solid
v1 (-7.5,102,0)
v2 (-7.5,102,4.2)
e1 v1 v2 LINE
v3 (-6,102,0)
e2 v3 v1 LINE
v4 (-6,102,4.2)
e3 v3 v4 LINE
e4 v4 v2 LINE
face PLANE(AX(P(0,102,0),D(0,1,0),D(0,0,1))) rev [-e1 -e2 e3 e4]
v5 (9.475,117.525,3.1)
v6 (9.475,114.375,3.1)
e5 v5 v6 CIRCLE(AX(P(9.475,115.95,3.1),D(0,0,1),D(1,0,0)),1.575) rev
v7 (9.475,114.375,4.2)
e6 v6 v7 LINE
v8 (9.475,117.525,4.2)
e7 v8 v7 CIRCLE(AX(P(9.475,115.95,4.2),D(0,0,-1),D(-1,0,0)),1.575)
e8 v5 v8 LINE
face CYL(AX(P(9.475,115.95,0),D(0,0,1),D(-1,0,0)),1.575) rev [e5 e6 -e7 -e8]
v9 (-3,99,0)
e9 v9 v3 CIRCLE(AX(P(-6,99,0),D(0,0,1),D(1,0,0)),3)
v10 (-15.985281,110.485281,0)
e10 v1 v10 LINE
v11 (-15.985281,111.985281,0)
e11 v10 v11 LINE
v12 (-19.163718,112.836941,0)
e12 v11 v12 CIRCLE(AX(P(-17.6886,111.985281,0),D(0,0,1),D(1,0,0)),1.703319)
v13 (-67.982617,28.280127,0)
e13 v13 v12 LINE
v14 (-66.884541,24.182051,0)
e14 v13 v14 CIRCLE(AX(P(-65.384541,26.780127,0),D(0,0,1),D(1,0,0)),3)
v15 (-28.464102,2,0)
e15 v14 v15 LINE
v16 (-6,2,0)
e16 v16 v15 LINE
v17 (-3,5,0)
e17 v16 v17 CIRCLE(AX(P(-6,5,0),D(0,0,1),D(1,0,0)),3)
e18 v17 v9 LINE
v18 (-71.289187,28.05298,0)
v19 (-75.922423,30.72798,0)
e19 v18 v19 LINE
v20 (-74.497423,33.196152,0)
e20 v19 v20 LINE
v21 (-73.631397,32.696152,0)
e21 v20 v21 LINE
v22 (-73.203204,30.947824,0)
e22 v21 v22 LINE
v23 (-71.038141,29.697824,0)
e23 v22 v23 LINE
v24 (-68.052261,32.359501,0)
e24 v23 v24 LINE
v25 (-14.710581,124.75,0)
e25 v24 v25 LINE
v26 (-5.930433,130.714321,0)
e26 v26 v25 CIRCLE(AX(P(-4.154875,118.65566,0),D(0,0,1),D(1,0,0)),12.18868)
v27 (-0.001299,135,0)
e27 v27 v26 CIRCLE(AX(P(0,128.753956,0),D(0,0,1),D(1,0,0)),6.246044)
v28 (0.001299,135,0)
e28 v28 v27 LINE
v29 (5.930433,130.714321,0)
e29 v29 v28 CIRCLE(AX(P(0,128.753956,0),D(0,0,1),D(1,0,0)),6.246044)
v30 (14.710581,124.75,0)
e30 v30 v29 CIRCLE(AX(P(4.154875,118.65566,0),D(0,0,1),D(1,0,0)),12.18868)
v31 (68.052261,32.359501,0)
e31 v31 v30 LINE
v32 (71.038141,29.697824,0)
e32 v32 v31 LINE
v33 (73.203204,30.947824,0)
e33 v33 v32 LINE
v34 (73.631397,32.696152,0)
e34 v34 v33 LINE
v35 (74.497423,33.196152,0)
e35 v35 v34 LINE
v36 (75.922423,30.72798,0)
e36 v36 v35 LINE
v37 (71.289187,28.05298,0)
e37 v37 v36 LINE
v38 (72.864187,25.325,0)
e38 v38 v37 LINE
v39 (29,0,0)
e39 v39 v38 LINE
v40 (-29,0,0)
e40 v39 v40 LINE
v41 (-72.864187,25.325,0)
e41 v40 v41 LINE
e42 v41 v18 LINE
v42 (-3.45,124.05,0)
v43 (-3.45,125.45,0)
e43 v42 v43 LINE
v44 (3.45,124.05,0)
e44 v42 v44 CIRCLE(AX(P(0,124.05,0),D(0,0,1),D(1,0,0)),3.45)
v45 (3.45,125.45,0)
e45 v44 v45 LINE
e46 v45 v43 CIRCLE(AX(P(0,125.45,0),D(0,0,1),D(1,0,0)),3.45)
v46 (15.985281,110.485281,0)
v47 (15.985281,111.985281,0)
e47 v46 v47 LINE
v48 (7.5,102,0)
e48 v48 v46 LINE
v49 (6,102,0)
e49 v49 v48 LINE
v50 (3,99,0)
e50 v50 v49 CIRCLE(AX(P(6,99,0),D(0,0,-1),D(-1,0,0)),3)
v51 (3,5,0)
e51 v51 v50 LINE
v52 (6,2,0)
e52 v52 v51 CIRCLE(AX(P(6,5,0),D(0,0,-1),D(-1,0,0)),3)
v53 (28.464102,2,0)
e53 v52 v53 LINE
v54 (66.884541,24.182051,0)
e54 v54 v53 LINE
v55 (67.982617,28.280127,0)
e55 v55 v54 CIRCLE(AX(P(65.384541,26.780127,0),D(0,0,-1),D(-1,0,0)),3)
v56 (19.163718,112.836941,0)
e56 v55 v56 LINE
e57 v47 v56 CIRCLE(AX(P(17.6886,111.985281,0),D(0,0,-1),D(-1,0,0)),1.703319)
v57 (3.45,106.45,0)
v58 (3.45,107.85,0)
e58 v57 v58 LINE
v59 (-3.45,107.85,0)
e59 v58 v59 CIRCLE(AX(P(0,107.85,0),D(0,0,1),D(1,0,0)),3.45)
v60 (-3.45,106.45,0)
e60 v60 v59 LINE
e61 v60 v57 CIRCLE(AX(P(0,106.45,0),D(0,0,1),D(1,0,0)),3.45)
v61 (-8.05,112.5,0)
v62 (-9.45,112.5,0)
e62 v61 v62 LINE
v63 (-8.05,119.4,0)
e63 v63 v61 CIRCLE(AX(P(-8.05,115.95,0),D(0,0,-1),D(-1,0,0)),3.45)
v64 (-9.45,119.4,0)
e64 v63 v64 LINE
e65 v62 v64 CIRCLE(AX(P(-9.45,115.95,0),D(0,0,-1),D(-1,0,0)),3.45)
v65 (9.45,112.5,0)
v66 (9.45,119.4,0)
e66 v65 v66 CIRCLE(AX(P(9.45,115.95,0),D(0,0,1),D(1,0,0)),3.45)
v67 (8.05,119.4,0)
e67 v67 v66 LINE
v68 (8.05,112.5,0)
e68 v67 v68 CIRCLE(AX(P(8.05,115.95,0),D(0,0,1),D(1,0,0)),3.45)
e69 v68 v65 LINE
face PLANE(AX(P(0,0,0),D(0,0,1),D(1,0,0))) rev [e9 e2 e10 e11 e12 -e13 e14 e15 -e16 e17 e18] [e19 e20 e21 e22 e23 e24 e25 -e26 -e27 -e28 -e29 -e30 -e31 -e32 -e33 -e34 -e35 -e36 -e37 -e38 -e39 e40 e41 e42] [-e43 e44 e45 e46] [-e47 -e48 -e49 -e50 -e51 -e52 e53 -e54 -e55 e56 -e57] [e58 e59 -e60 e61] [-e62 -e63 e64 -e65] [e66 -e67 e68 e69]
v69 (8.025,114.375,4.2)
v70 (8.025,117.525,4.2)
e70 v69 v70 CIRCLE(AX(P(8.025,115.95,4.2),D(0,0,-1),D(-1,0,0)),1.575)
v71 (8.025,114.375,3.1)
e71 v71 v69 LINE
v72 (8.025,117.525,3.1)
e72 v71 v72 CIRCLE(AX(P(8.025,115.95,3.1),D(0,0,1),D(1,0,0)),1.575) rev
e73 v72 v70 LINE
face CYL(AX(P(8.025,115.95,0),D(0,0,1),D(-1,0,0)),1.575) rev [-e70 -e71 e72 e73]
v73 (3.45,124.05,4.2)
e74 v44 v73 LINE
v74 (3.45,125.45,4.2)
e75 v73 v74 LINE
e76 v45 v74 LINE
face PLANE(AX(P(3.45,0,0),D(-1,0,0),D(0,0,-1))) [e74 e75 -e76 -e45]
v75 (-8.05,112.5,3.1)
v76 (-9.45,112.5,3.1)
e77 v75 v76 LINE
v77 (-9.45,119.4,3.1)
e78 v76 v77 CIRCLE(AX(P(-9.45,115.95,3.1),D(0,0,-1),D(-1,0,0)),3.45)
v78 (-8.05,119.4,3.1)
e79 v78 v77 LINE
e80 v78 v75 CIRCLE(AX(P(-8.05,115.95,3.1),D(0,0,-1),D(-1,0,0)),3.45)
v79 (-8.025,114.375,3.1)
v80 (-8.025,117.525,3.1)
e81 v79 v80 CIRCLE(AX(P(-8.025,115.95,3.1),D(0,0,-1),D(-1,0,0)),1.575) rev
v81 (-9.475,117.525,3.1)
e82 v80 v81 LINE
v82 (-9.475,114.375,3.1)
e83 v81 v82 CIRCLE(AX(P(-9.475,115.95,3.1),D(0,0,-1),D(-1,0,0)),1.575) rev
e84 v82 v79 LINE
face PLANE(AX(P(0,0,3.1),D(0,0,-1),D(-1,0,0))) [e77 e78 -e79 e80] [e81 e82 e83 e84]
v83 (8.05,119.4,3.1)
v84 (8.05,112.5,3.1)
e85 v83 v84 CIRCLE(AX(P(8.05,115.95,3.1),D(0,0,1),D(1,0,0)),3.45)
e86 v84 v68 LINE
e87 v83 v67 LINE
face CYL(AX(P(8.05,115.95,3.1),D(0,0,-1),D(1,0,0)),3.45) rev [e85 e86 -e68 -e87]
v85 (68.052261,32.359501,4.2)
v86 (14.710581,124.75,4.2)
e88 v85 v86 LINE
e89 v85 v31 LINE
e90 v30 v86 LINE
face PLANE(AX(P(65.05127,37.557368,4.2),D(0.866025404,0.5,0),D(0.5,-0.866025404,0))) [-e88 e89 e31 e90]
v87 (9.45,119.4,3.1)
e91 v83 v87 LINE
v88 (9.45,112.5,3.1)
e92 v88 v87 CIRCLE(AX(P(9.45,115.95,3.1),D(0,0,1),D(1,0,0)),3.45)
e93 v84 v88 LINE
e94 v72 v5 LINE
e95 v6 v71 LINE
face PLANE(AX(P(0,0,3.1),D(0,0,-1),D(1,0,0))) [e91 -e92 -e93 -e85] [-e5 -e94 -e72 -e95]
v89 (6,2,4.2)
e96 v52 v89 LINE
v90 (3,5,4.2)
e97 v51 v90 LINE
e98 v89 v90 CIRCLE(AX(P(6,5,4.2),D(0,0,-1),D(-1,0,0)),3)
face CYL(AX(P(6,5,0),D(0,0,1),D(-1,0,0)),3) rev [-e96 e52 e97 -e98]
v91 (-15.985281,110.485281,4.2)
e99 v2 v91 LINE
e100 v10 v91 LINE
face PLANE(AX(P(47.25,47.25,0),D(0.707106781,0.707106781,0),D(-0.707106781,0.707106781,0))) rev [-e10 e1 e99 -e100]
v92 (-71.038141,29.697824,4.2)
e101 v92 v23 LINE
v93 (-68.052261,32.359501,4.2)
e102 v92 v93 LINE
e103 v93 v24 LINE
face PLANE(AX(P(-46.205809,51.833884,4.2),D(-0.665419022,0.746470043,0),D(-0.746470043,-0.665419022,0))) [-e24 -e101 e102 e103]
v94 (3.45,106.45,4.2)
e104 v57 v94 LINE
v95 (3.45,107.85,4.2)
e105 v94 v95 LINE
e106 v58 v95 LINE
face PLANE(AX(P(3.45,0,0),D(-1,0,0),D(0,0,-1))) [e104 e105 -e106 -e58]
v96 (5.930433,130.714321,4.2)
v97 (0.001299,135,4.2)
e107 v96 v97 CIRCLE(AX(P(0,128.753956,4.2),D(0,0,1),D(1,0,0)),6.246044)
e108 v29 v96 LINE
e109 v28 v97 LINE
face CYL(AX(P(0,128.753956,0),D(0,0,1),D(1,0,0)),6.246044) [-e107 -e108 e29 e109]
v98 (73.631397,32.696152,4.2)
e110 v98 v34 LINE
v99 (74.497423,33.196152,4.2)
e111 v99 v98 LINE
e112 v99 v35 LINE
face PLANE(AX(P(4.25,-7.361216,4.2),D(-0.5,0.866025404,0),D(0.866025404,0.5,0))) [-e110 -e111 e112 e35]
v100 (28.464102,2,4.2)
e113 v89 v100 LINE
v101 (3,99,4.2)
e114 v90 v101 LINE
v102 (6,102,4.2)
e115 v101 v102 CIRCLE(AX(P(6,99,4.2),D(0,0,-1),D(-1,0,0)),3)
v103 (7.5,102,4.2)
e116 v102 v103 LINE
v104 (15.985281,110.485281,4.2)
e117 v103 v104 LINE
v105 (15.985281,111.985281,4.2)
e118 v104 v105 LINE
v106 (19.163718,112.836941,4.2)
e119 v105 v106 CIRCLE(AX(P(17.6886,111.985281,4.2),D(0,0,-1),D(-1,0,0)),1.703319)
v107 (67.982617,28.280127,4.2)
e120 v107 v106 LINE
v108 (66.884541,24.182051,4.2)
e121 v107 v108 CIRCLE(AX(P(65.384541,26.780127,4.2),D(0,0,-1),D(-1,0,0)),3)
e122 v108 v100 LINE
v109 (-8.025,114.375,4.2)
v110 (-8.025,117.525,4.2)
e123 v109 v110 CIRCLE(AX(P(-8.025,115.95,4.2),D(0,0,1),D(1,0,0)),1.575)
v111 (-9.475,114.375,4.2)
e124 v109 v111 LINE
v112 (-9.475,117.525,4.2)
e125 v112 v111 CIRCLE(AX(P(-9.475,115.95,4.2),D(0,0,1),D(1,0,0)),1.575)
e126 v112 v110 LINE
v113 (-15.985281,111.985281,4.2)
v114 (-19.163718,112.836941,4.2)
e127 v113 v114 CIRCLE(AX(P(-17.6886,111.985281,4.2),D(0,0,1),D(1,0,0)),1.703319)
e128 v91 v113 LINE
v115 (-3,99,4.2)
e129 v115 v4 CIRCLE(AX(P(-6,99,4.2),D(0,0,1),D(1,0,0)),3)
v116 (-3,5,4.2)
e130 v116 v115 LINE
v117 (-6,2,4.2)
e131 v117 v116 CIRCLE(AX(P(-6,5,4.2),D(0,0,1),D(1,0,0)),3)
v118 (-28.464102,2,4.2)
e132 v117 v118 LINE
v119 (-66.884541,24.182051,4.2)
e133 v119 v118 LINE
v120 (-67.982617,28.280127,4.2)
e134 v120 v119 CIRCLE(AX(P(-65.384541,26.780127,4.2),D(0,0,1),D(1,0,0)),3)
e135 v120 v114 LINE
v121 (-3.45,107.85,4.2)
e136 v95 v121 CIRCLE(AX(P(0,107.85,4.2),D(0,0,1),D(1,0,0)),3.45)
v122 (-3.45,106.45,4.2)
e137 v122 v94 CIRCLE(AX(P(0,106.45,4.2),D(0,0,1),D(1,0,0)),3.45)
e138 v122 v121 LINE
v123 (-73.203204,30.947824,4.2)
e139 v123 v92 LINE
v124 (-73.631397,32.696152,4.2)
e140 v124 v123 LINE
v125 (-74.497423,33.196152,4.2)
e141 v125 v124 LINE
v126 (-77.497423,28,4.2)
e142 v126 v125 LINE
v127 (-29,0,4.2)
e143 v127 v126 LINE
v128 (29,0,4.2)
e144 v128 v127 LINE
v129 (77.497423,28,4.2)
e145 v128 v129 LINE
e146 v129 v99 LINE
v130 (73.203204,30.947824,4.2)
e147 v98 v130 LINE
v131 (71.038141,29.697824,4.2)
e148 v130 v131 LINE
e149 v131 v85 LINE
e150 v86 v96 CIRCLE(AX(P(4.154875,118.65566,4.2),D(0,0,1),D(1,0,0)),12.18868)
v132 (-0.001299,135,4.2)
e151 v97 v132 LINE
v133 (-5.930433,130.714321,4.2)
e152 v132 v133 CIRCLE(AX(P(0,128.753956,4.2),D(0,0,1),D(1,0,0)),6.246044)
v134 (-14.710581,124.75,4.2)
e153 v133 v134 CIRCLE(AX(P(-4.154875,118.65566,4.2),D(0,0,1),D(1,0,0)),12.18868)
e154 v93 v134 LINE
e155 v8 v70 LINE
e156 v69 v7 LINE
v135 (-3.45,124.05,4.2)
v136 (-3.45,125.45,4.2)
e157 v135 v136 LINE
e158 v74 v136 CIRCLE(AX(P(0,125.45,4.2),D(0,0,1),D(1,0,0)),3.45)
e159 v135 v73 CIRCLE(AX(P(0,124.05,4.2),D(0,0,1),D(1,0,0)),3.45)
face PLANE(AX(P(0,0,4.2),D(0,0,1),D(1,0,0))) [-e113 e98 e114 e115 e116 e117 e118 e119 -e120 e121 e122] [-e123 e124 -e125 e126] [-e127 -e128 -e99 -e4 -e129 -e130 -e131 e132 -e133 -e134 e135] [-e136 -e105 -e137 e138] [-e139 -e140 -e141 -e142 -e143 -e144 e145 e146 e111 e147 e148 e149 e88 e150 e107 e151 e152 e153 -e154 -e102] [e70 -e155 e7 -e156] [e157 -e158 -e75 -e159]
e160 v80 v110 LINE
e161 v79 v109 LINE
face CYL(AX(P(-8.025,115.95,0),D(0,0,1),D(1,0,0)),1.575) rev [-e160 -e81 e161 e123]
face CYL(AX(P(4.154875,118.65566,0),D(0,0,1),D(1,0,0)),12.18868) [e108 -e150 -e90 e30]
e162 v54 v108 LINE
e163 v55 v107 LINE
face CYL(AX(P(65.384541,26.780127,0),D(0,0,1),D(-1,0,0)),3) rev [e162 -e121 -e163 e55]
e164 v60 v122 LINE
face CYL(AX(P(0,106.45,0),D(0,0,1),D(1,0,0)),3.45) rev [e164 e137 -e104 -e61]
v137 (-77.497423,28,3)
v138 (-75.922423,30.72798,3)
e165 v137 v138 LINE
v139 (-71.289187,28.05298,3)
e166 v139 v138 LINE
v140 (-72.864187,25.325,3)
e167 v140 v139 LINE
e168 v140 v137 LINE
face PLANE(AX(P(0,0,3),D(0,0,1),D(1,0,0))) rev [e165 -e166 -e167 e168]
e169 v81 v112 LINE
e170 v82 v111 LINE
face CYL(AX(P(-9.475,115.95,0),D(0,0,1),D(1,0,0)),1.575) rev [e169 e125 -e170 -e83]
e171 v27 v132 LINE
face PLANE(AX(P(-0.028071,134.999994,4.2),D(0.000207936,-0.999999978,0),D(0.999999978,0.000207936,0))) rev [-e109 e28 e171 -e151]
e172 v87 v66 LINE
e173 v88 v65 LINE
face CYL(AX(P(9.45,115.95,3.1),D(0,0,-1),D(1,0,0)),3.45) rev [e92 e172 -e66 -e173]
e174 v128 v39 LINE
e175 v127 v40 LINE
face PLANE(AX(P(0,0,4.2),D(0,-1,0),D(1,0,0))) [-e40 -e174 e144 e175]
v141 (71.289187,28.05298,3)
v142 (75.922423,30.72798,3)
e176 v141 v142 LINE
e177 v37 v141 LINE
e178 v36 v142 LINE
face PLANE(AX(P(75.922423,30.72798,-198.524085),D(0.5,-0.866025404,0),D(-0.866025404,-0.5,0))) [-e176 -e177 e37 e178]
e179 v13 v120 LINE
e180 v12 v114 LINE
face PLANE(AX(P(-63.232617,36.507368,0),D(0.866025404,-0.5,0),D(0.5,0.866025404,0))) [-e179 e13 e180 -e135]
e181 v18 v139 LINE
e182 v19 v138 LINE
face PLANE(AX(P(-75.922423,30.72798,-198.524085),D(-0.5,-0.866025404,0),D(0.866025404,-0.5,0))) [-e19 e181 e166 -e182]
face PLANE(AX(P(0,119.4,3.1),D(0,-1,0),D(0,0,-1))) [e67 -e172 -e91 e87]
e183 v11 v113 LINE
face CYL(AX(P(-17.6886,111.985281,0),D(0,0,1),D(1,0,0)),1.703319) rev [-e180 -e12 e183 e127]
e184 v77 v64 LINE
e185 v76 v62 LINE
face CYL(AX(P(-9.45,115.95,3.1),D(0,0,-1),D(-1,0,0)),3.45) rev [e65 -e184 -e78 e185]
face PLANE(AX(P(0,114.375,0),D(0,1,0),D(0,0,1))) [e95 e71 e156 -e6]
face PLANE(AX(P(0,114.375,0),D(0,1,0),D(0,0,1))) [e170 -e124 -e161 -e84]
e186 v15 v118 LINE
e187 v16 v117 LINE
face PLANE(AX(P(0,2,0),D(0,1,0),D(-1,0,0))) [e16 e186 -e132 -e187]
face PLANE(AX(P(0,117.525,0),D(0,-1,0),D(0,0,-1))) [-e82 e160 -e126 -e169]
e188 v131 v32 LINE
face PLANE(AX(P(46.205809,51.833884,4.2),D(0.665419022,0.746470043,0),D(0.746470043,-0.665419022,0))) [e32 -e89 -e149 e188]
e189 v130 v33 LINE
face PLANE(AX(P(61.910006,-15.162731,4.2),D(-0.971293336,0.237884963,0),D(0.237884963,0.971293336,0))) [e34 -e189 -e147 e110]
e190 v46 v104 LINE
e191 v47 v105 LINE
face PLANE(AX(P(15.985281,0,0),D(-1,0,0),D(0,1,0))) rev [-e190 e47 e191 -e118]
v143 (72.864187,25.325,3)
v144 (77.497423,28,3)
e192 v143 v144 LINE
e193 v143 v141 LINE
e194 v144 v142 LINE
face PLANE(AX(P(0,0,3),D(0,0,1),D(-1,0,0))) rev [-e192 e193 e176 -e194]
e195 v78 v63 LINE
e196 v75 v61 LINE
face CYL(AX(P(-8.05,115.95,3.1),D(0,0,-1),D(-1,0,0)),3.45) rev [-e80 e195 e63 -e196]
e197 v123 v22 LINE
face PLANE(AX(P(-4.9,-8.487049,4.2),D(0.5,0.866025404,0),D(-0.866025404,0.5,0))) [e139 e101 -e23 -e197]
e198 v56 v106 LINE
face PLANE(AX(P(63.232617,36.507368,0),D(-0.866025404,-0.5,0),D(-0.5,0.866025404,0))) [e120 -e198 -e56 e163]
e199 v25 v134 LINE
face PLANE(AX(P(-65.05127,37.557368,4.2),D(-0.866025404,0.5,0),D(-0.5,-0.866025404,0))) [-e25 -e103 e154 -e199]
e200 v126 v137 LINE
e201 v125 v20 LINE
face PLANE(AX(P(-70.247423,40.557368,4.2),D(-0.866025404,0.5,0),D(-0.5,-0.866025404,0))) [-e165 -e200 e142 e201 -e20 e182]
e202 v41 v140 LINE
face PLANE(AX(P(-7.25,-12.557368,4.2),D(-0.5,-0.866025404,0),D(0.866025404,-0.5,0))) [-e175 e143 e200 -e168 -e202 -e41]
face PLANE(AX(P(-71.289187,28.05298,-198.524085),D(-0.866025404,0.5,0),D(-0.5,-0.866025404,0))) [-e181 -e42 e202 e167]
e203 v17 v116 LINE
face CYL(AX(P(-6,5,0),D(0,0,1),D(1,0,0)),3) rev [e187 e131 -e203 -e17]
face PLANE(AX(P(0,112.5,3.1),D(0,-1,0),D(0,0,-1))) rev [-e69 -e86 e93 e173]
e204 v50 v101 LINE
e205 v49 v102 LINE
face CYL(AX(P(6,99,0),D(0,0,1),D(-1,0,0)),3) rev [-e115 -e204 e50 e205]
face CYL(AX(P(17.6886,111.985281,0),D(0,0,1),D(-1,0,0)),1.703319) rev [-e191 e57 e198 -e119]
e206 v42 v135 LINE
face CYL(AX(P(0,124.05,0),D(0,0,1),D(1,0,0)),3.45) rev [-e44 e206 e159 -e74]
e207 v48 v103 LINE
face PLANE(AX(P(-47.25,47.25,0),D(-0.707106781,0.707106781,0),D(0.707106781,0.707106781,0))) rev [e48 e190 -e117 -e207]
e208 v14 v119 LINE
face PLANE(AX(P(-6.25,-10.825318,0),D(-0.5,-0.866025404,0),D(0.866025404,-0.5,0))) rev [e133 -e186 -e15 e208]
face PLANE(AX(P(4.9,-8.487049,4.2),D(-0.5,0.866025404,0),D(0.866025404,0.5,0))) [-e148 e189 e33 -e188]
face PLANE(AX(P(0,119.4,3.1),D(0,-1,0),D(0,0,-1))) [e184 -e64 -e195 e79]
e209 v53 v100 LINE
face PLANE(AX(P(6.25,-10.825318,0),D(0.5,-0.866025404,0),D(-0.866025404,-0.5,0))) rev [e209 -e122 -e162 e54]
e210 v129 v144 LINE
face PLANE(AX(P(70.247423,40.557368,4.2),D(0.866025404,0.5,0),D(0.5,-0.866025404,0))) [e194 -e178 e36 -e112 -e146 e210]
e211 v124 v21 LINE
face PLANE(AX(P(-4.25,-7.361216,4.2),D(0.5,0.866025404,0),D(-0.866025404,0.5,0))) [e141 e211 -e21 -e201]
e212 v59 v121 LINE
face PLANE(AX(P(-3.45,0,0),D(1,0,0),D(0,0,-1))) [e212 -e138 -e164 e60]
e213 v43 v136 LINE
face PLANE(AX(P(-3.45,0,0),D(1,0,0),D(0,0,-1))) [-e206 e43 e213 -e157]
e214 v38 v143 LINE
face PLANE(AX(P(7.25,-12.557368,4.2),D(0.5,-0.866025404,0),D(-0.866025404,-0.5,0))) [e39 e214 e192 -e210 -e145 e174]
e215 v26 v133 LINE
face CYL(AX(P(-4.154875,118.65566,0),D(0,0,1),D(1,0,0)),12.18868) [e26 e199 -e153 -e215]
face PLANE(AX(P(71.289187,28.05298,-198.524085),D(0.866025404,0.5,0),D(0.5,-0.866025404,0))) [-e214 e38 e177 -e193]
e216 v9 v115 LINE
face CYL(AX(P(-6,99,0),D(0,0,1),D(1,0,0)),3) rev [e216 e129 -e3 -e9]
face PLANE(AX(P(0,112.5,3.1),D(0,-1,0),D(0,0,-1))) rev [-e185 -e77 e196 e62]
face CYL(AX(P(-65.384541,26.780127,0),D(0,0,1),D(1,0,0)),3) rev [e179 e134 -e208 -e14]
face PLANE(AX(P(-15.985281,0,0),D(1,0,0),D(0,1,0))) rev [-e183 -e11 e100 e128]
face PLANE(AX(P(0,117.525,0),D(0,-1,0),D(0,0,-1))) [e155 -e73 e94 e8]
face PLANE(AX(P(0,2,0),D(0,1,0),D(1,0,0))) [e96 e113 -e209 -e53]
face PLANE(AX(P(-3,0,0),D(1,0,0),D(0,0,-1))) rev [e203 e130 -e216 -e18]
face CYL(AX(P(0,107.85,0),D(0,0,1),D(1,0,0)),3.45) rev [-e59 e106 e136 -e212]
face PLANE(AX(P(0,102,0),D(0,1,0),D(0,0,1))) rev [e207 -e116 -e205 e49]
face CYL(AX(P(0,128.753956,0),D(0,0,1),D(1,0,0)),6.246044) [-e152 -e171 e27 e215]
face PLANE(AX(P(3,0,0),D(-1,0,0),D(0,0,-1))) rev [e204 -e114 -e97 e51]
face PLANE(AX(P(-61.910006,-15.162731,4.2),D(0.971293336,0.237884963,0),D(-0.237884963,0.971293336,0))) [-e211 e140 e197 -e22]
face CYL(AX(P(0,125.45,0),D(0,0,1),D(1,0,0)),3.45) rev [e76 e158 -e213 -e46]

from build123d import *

# Parameters (mm, degrees)
SALIENTE_EXTRUIR1_DEPTH    = 4.2
CORTAR_EXTRUIR1_DEPTH      = 4.2
CORTAR_EXTRUIR2_DEPTH      = 4.2
CORTAR_EXTRUIR3_START      = -3.1
CORTAR_EXTRUIR3_DEPTH      = 3.1
CORTAR_EXTRUIR4_DEPTH      = 156.719268273
CORTAR_EXTRUIR4_DEPTH_BACK = 3
CORTAR_EXTRUIR5_DEPTH      = 156.719268273


with BuildPart() as part:
    # Croquis1 → Saliente-Extruir1 (new body)
    with BuildSketch(Plane.XY):
        Polygon((-29, 0), (0, 0), (0, 135), (-8.793796291, 134.998171452), (-68.052260592, 32.359500504), (-71.038140766, 29.697824418), (-73.203204276, 30.947824418), (-73.631397208, 32.696152423), (-74.497422612, 33.196152423), (-77.497422612, 28), align=None)
    extrude(amount=SALIENTE_EXTRUIR1_DEPTH)

    # Croquis2 → Cortar-Extruir1 (cut)
    with BuildSketch(Plane.XY.offset(4.2)):
        with BuildLine():
            Line((-28.464101615, 2), (-6, 2))
            ThreePointArc((-6, 2), (-3.878679656, 2.878679656), (-3, 5))
            Line((-3, 5), (-3, 99))
            ThreePointArc((-3, 99), (-3.878679656, 101.121320344), (-6, 102))
            Line((-6, 102), (-7.5, 102))
            Line((-7.5, 102), (-15.985281374, 110.485281374))
            Line((-15.985281374, 110.485281374), (-15.985281374, 111.985281374))
            ThreePointArc((-15.985281374, 111.985281374), (-17.247748826, 113.63056104), (-19.163717591, 112.836940891))
            Line((-19.163717591, 112.836940891), (-67.982616962, 28.28012681))
            ThreePointArc((-67.982616962, 28.28012681), (-68.282318046, 26.003669651), (-66.884540421, 24.182050687))
            Line((-66.884540421, 24.182050687), (-28.464101615, 2))
        make_face()
    extrude(amount=-CORTAR_EXTRUIR1_DEPTH, mode=Mode.SUBTRACT)

    # Croquis3 → Cortar-Extruir2 (cut)
    with BuildSketch(Plane.XY.offset(4.2)):
        with BuildLine():
            ThreePointArc((-3.45, 124.05), (-2.439518395, 121.610481605), (0, 120.6))
            Line((0, 120.6), (0, 128.9))
            ThreePointArc((0, 128.9), (-2.439518395, 127.889518395), (-3.45, 125.45))
            Line((-3.45, 125.45), (-3.45, 124.05))
        make_face()
        with BuildLine():
            Line((-3.45, 107.85), (-3.45, 106.45))
            ThreePointArc((-3.45, 106.45), (-2.439518395, 104.010481605), (0, 103))
            Line((0, 103), (0, 111.3))
            ThreePointArc((0, 111.3), (-2.439518395, 110.289518395), (-3.45, 107.85))
        make_face()
        with BuildLine():
            ThreePointArc((-9.475, 117.525), (-11.05, 115.95), (-9.475, 114.375))
            Line((-9.475, 114.375), (-8.025, 114.375))
            ThreePointArc((-8.025, 114.375), (-6.45, 115.95), (-8.025, 117.525))
            Line((-8.025, 117.525), (-9.475, 117.525))
        make_face()
    extrude(amount=-CORTAR_EXTRUIR2_DEPTH, mode=Mode.SUBTRACT)

    # Croquis4 → Cortar-Extruir3 (cut)
    with BuildSketch(Plane(origin=(0, 0, 0), x_dir=(-1, 0, 0), z_dir=(0, 0, -1)).offset(CORTAR_EXTRUIR3_START)):
        with BuildLine():
            ThreePointArc((8.05, 119.4), (4.6, 115.95), (8.05, 112.5))
            Line((8.05, 112.5), (9.45, 112.5))
            ThreePointArc((9.45, 112.5), (12.9, 115.95), (9.45, 119.4))
            Line((9.45, 119.4), (8.05, 119.4))
        make_face()
        with BuildLine():
            Line((8.025, 117.525), (9.475, 117.525))
            ThreePointArc((9.475, 117.525), (11.05, 115.95), (9.475, 114.375))
            Line((9.475, 114.375), (8.025, 114.375))
            ThreePointArc((8.025, 114.375), (6.45, 115.95), (8.025, 117.525))
        make_face(mode=Mode.SUBTRACT)
    extrude(amount=CORTAR_EXTRUIR3_DEPTH, mode=Mode.SUBTRACT)

    # Croquis5 → Cortar-Extruir4 (cut, two sides: drawn at the far end of the back side and taken through both)
    with BuildSketch(Plane(origin=(0, 0, 0), x_dir=(-1, 0, 0), z_dir=(0, 0, -1)).offset(-CORTAR_EXTRUIR4_DEPTH_BACK)):
        Polygon((312.647110497, 167.401042296), (75.922422612, 30.727980022), (71.289186702, 28.052980022), (72.864186702, 25.325), (209.537248976, -211.399687885), (737.036585646, -354.985428944), (840.146447168, 23.815301238), align=None)
    extrude(amount=CORTAR_EXTRUIR4_DEPTH + CORTAR_EXTRUIR4_DEPTH_BACK, mode=Mode.SUBTRACT)

    # Simetría2: part across plane


with BuildPart() as part_1:
    add(part.part)
    add(part.part.mirror(Plane(origin=(0, 0, 4.2), x_dir=(0, 0, 1), z_dir=(-1, 0, 0))))

    # Croquis7 → Cortar-Extruir5 (cut, through all)
    with BuildSketch(Plane.XY.offset(4.2)):
        with BuildLine():
            Line((8.793796291, 134.998171452), (0, 135))
            ThreePointArc((0, 135), (3.658451804, 133.816445156), (5.930432994, 130.714321183))
            ThreePointArc((5.930432994, 130.714321183), (11.003838282, 128.738100788), (14.710580838, 124.75))
            Line((14.710580838, 124.75), (8.793796291, 134.998171452))
        make_face()
        with BuildLine():
            Line((-8.793796291, 134.998171452), (-14.710580838, 124.75))
            ThreePointArc((-14.710580838, 124.75), (-11.003838282, 128.738100788), (-5.930432994, 130.714321183))
            ThreePointArc((-5.930432994, 130.714321183), (-3.658451804, 133.816445156), (0, 135))
            Line((0, 135), (-8.793796291, 134.998171452))
        make_face()
    extrude(amount=-CORTAR_EXTRUIR5_DEPTH, mode=Mode.SUBTRACT)


solid = part_1.part
